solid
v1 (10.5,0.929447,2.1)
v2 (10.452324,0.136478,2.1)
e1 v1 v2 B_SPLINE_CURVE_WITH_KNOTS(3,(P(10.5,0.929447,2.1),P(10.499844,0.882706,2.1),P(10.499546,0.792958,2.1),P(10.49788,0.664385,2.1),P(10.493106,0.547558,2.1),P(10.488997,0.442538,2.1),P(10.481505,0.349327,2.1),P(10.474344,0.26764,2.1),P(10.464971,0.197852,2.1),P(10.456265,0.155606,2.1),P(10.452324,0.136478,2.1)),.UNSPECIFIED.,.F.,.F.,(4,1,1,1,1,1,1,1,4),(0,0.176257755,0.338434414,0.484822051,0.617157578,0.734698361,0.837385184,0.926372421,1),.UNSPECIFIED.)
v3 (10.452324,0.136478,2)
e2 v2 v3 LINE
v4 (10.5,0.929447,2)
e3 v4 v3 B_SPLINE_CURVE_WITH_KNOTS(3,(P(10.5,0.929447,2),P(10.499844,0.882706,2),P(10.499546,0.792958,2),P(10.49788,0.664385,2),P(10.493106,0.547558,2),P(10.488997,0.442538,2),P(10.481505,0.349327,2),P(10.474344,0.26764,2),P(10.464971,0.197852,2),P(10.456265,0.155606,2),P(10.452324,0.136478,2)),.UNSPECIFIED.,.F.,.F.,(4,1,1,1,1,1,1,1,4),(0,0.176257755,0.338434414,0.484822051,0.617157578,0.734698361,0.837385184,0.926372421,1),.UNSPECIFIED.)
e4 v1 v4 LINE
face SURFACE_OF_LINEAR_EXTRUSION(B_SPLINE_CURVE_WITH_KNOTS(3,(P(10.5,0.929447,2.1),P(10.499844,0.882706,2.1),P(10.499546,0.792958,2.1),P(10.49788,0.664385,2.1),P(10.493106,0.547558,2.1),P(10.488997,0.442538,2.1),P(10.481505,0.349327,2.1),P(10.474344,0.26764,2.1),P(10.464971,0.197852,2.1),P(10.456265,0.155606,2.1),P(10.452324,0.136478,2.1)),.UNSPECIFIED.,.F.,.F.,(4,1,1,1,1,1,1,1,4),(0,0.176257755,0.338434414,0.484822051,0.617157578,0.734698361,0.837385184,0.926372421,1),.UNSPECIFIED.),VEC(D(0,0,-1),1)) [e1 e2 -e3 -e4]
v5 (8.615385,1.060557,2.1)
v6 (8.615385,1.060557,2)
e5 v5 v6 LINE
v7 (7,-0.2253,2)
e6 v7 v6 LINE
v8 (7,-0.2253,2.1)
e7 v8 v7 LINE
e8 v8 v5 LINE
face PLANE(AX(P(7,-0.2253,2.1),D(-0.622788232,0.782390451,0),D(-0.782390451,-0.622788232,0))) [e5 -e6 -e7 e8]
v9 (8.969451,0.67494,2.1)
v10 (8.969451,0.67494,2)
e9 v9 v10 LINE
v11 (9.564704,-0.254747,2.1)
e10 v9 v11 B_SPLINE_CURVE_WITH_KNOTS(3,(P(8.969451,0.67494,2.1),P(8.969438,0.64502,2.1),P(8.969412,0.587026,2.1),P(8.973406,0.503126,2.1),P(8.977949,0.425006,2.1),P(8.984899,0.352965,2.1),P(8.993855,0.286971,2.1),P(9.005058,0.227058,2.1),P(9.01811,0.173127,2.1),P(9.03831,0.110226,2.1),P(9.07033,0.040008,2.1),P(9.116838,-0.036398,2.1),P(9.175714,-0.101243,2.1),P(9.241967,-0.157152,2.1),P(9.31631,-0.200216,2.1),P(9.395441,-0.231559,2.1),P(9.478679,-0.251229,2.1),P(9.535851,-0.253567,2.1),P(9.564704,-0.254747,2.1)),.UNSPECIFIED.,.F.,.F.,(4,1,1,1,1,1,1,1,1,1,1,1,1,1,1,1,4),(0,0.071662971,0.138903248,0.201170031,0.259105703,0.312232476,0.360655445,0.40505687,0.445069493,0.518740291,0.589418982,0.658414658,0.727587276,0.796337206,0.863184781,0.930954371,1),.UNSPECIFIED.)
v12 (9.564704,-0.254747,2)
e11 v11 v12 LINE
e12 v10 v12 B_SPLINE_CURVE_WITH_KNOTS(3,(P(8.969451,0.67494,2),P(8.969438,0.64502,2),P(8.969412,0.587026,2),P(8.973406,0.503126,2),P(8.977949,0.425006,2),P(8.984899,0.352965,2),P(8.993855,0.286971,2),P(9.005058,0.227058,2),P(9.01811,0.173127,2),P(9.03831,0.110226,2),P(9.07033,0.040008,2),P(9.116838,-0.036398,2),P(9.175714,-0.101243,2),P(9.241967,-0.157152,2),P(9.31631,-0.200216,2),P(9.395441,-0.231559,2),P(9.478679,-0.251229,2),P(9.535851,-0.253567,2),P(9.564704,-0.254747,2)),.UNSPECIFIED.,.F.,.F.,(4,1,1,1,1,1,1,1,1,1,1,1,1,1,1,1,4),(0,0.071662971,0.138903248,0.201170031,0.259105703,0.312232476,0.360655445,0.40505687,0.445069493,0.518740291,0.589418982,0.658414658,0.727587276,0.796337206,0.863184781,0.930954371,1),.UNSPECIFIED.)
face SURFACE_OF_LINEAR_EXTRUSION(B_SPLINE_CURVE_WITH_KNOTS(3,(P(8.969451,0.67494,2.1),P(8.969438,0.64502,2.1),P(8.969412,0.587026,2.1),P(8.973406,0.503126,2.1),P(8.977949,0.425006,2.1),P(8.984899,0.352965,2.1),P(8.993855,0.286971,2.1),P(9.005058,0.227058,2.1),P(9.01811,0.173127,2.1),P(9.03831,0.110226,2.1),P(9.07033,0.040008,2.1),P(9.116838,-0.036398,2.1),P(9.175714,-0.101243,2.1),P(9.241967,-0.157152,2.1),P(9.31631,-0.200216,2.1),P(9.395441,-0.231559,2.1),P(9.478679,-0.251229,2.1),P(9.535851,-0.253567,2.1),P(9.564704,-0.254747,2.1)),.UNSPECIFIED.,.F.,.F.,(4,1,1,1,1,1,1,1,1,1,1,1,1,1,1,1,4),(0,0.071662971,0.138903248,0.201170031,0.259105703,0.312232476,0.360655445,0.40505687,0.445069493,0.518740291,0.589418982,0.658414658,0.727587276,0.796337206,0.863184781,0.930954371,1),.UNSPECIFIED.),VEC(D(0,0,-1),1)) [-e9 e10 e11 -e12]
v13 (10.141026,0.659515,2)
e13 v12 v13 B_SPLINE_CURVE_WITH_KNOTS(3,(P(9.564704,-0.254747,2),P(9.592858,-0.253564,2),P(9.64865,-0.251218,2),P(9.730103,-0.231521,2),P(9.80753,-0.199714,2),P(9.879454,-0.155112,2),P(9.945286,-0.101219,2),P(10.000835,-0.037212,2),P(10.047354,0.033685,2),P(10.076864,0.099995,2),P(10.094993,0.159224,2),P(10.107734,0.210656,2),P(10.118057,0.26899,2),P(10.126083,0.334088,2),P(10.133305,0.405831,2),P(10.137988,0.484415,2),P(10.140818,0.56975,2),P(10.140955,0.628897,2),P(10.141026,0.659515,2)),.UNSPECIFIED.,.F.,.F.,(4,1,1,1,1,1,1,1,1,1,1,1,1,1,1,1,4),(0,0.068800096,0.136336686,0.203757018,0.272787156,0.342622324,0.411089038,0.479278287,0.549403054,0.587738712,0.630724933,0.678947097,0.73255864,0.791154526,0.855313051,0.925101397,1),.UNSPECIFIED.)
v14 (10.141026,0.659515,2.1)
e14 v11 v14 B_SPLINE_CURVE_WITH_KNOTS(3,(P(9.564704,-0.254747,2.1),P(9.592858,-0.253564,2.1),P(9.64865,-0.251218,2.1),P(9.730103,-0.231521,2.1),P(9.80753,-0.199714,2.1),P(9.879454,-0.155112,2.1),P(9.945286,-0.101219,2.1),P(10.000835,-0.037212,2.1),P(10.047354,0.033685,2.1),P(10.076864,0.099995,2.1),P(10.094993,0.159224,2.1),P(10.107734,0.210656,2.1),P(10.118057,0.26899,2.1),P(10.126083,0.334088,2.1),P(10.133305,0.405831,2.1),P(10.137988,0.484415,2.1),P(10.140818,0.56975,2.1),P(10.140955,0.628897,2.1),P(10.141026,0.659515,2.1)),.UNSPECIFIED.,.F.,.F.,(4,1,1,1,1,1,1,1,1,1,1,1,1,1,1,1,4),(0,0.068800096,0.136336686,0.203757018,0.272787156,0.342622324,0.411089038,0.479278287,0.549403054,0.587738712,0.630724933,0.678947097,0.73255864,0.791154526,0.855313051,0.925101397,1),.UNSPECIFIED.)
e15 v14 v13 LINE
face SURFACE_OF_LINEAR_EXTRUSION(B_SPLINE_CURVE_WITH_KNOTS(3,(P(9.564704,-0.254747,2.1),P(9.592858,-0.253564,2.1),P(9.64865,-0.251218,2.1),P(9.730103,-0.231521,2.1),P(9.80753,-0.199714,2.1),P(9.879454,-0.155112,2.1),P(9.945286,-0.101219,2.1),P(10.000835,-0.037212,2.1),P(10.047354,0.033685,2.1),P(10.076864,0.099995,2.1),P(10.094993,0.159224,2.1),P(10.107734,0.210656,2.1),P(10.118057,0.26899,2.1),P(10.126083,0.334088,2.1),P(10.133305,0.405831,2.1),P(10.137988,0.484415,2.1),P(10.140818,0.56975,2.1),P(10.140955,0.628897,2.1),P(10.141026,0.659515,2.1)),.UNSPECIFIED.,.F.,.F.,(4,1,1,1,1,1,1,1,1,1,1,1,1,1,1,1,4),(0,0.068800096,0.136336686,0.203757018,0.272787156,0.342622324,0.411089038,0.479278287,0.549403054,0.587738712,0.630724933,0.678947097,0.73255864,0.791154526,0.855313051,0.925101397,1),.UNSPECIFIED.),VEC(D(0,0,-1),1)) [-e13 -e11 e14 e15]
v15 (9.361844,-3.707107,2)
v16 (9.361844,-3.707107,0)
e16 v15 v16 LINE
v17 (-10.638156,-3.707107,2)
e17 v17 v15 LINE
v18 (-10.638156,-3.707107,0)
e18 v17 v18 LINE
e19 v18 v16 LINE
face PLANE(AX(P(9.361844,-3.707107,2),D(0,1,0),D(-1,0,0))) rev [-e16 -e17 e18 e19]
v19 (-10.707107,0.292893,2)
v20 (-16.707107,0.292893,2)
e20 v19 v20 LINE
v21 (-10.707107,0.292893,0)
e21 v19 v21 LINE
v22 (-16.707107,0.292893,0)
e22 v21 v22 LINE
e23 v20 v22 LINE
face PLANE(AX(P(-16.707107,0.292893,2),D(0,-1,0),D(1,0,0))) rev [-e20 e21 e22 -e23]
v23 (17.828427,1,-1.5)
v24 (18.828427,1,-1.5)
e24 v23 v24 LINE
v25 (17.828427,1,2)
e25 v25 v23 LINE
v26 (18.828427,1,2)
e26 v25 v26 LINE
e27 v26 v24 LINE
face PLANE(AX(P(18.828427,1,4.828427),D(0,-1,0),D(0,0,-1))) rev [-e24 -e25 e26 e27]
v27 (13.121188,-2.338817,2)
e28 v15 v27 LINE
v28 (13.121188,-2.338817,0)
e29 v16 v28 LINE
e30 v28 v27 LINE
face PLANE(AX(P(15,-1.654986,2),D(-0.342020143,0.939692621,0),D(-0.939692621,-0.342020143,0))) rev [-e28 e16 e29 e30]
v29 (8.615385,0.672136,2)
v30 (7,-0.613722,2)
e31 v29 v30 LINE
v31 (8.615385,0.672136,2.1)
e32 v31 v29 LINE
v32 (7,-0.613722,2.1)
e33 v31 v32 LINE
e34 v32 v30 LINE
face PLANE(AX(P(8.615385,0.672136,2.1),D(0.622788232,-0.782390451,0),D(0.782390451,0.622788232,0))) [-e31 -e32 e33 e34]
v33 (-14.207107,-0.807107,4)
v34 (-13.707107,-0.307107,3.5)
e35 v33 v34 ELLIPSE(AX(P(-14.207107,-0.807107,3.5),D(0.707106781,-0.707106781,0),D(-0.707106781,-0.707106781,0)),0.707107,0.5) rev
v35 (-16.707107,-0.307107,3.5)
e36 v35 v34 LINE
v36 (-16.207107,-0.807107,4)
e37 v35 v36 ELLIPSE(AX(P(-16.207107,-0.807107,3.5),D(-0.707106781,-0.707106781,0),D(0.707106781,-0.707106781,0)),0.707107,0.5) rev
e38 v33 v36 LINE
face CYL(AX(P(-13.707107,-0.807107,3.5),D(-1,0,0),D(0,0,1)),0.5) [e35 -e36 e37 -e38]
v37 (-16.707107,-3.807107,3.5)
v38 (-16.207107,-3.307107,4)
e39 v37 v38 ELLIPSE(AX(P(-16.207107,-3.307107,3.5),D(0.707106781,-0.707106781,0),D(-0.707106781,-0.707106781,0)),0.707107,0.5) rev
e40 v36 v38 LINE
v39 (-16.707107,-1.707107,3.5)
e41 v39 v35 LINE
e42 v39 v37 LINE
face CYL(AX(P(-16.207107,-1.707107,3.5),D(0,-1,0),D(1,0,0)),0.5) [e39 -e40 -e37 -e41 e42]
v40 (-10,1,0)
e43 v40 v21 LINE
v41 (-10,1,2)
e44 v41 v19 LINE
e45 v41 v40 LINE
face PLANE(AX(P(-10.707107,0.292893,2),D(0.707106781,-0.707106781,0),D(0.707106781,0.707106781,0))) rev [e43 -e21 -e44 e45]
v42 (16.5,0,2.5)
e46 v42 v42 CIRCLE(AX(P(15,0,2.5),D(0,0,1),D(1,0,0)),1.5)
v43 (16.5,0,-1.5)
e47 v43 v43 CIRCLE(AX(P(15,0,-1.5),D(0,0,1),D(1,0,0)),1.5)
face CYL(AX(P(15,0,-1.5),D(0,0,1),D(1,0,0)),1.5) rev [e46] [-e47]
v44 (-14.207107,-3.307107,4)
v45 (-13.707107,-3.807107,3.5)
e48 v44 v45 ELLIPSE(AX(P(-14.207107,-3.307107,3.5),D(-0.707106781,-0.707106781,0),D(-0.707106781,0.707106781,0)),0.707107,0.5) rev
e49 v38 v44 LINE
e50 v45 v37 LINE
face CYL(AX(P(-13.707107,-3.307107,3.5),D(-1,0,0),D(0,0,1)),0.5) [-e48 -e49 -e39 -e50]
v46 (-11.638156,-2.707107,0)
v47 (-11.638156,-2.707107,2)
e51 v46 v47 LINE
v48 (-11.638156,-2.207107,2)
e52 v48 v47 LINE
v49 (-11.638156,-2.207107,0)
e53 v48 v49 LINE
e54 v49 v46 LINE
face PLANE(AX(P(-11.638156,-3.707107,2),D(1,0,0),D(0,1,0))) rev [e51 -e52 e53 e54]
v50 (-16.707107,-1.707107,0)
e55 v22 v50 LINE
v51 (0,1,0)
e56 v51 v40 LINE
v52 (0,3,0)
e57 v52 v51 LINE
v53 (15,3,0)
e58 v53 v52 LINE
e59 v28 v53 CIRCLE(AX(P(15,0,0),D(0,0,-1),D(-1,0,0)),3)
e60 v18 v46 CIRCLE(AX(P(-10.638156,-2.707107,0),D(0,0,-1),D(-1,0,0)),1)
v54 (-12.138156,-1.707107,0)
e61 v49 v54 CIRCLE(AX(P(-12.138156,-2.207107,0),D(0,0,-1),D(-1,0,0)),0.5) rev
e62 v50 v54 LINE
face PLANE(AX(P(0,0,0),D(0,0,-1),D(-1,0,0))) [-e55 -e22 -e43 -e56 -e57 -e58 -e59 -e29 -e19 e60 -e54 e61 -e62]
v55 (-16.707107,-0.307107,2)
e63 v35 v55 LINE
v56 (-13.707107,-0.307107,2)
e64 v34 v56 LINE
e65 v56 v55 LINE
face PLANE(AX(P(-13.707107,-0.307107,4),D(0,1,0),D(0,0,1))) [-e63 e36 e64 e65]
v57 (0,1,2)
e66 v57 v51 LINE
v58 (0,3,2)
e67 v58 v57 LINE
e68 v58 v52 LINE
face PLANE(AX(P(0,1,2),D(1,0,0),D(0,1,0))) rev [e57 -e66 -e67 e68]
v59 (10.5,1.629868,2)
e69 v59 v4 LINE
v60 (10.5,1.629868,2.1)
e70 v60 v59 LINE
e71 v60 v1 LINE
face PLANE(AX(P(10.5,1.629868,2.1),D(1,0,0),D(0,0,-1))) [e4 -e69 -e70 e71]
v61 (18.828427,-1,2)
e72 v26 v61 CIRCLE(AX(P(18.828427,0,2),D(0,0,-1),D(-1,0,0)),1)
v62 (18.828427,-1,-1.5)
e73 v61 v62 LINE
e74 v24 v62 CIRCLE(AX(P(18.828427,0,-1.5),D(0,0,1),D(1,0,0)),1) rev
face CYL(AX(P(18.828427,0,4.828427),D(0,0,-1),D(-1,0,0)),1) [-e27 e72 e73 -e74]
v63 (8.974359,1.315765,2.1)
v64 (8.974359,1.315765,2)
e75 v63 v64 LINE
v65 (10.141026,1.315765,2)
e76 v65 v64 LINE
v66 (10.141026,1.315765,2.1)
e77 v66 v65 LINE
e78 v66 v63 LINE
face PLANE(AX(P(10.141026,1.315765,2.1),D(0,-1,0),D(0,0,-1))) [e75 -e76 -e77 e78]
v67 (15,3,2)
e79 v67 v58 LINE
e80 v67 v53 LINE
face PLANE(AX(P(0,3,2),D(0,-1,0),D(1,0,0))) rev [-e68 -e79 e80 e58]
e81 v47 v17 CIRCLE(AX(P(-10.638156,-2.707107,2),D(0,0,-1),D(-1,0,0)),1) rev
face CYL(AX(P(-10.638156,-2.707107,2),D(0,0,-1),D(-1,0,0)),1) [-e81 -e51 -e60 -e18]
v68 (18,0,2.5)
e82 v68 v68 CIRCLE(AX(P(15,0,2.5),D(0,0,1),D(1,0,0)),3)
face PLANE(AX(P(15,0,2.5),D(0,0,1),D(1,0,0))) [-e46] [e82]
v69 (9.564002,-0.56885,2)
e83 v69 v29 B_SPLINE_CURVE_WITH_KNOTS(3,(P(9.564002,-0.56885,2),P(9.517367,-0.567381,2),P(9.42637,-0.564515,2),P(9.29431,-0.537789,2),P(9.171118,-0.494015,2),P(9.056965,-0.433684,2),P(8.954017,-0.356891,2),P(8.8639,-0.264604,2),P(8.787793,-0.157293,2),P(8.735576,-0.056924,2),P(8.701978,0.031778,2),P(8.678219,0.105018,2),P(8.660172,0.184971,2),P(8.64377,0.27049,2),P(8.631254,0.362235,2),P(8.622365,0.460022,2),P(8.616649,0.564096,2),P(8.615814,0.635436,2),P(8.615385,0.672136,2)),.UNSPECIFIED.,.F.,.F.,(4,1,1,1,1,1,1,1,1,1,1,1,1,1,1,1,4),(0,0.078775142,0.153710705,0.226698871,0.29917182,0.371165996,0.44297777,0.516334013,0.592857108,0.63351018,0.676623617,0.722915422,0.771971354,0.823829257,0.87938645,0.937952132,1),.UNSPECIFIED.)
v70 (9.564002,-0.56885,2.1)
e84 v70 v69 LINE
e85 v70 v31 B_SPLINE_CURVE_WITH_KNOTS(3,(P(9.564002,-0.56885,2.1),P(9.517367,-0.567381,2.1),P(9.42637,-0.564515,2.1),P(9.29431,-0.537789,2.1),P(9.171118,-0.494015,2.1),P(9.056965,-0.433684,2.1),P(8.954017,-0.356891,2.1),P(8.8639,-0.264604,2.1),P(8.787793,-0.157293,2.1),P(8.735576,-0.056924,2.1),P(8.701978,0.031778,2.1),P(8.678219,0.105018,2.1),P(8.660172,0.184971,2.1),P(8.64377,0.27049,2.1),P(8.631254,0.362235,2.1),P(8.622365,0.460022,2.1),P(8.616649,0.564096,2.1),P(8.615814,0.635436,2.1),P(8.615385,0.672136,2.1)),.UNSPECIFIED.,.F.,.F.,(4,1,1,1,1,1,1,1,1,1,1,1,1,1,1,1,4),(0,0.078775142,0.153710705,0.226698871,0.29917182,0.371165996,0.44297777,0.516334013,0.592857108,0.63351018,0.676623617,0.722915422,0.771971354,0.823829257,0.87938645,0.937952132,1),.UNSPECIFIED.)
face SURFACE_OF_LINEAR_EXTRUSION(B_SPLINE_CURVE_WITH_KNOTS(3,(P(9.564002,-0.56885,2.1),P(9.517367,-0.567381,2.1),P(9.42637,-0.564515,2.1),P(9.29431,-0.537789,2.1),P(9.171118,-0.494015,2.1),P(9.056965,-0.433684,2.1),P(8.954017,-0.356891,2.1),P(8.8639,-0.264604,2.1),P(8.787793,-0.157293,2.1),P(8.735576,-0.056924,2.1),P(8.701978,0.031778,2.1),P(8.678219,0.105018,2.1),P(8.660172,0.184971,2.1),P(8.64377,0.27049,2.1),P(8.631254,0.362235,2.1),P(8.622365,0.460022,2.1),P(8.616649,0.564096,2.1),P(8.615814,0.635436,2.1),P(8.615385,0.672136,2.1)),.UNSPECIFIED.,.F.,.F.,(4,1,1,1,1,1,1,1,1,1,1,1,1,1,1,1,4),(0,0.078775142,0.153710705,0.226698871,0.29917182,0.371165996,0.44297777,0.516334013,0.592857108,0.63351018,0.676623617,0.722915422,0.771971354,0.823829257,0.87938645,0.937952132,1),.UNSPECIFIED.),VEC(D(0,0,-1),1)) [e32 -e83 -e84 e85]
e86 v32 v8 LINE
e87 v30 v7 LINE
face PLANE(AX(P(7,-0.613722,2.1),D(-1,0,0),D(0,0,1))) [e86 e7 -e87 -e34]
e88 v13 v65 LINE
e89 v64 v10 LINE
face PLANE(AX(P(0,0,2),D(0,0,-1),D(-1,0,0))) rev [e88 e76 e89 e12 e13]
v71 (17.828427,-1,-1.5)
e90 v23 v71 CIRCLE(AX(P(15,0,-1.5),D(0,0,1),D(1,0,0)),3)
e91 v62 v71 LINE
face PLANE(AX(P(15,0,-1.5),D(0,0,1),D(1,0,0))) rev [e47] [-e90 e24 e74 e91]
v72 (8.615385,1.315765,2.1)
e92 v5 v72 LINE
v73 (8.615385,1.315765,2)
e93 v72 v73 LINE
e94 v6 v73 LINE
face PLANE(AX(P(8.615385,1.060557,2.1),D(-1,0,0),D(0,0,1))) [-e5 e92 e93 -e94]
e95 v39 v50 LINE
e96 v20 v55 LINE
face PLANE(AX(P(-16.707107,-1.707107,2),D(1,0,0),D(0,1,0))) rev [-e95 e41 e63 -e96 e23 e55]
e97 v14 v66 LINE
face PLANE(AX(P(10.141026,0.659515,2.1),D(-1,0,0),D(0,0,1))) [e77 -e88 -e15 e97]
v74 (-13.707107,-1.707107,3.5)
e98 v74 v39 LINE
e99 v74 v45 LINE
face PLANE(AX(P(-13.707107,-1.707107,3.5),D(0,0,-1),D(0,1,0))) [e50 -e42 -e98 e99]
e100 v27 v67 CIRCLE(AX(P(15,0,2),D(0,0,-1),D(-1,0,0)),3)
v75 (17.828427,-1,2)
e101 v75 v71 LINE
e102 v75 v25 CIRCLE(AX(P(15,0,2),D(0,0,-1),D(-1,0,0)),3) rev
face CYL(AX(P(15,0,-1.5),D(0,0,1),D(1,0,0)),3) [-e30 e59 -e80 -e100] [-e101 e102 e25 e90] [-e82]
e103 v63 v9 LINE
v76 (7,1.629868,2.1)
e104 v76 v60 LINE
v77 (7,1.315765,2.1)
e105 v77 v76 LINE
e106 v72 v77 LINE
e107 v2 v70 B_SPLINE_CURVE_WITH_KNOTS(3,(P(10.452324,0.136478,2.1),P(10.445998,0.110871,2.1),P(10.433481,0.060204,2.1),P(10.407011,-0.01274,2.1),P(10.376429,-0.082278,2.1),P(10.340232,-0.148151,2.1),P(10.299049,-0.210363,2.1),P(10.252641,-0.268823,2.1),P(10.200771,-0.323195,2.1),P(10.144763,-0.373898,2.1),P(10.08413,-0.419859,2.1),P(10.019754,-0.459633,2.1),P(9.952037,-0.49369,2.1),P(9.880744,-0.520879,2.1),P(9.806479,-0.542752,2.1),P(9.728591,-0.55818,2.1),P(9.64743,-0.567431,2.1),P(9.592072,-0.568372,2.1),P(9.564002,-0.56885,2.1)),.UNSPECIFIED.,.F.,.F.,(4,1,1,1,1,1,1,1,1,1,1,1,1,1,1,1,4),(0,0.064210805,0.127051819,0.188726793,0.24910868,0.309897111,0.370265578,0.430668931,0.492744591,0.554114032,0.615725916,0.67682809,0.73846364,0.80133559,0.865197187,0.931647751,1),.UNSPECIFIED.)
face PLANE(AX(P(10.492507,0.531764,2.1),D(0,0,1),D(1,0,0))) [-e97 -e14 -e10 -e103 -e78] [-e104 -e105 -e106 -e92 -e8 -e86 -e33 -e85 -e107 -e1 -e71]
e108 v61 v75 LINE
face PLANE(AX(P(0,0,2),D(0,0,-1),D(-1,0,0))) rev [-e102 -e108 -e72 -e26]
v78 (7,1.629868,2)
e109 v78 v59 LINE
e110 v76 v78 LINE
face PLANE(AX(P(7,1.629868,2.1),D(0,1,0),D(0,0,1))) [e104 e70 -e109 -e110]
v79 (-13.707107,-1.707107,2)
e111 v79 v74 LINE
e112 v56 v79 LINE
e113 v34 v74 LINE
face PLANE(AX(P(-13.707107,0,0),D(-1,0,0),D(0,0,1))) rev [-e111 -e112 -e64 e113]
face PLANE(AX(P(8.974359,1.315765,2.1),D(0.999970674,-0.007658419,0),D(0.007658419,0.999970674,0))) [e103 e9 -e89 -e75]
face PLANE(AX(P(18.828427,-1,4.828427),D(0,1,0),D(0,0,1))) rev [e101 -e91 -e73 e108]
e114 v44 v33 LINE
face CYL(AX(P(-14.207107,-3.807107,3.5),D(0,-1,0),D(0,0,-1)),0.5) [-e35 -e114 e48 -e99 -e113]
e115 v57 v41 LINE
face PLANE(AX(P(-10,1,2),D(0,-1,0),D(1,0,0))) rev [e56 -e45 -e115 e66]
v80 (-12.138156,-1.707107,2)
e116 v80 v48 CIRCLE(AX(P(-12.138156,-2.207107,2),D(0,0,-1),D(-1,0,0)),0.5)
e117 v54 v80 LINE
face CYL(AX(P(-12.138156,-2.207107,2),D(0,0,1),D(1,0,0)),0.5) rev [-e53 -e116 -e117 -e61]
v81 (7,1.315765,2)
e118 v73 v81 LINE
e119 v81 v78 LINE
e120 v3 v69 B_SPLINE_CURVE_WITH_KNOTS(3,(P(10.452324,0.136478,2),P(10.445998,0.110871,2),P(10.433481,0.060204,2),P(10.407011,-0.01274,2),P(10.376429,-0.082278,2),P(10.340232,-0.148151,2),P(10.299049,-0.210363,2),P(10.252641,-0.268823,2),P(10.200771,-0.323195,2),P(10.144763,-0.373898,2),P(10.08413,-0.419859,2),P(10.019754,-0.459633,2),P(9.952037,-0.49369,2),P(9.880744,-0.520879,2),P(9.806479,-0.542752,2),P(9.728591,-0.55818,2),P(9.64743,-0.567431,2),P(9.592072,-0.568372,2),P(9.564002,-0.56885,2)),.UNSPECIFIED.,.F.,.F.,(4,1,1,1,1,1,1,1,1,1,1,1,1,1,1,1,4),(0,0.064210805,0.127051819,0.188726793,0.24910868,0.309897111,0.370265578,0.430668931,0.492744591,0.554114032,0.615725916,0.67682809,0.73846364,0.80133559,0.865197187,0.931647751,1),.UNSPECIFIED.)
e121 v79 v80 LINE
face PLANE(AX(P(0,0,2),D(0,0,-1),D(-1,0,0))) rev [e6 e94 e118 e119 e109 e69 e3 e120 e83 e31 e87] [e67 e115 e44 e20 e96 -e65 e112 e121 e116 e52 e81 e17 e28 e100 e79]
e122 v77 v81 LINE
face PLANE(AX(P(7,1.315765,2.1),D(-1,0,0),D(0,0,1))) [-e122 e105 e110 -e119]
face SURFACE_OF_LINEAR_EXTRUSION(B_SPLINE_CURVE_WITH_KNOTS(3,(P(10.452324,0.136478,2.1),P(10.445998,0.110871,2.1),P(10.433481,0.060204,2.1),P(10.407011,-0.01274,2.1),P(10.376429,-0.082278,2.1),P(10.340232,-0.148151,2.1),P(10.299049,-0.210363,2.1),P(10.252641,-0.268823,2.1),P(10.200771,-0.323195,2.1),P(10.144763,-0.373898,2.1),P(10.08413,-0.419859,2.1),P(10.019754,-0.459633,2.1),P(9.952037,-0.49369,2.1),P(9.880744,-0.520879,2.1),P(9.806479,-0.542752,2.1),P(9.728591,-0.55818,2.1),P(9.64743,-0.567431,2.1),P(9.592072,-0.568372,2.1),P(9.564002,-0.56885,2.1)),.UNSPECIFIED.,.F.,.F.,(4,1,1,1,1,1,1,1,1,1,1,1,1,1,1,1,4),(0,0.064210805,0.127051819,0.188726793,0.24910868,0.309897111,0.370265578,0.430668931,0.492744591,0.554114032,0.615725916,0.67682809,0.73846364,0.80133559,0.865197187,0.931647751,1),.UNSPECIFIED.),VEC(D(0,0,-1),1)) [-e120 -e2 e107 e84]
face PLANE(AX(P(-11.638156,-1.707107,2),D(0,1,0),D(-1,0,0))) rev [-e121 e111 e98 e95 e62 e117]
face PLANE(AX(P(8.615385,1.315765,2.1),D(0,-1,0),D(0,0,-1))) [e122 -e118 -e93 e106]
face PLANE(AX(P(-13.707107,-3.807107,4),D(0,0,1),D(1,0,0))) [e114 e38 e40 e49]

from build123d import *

# Parameters (mm, degrees)
ESTRUSIONE_ESTRUSIONE1_DEPTH             = 2
RACCORDO1_R                              = 1
RACCORDO2_R                              = 0.5
ESTRUSIONE_ESTRUSIONE2_DEPTH             = 2.5
ESTRUSIONE_ESTRUSIONE2_DEPTH_BACK        = 1.5
SCHIZZO2_R                               = 3
ESTRUSIONE_ESTRUSIONE3_REACH             = 20.547
ESTRUSIONE_ESTRUSIONE3_DIRECTION_2_REACH = 20.547
ESTRUSIONE_ESTRUSIONE4_DEPTH             = 3
RACCORDO3_R                              = 0.5
SCHIZZO5_R                               = 1.5
TAGLIO_ESTRUSIONE1_DEPTH                 = 21.58301689
ESTRUSIONE_ESTRUSIONE5_DEPTH             = 0.1


with BuildPart() as part:
    # Schizzo1 → Estrusione-Estrusione1 (new body)
    with BuildSketch(Plane.XY):
        Polygon((-16.707106781, 0.292893219), (-10.707106781, 0.292893219), (-10, 1), (0, 1), (0, 3), (15, 3), (15, 0), (15, -1.654985921), (9.361844275, -3.707106781), (-11.638155725, -3.707106781), (-11.638155725, -1.707106781), (-16.707106781, -1.707106781), align=None)
    extrude(amount=ESTRUSIONE_ESTRUSIONE1_DEPTH)

    # Raccordo1
    raccordo1_edges = [part.edges().sort_by_distance(p)[0] for p in [
        (-11.638155725, -3.707106781, 1),
    ]]
    fillet(raccordo1_edges, radius=RACCORDO1_R)

    # Raccordo2
    raccordo2_edges = [part.edges().sort_by_distance(p)[0] for p in [
        (-11.638155725, -1.707106781, 1),
    ]]
    fillet(raccordo2_edges, radius=RACCORDO2_R)

    # Schizzo2 → Estrusione-Estrusione2 (add, two sides: drawn at the far end of the back side and taken through both)
    with BuildSketch(Plane.XY.offset(-ESTRUSIONE_ESTRUSIONE2_DEPTH_BACK)):
        with Locations((15, 0)):
            Circle(SCHIZZO2_R)
    extrude(amount=ESTRUSIONE_ESTRUSIONE2_DEPTH + ESTRUSIONE_ESTRUSIONE2_DEPTH_BACK)

    # Estrusione-Estrusione3: up to this face of the body (flat: up to its plane)
    estrusione_estrusione3_end = Plane(part.part.faces().sort_by_distance((0.378494116, -0.704899382, 2))[0])
    # Schizzo3 → Estrusione-Estrusione3 (add, up to the picked face)
    with BuildSketch(Plane.XY, mode=Mode.PRIVATE) as estrusione_estrusione3_sk1:
        with BuildLine():
            Line((18.828427125, 1), (17.828427125, 1))
            ThreePointArc((17.828427125, 1), (18, 0), (17.828427125, -1))
            Line((17.828427125, -1), (18.828427125, -1))
            ThreePointArc((18.828427125, -1), (19.828427125, 0), (18.828427125, 1))
        make_face()
    estrusione_estrusione3_tool1 = split(extrude(estrusione_estrusione3_sk1.sketch, amount=ESTRUSIONE_ESTRUSIONE3_REACH, mode=Mode.PRIVATE), bisect_by=estrusione_estrusione3_end, keep=Keep.BOTH, mode=Mode.PRIVATE)
    add(estrusione_estrusione3_tool1.solids().sort_by(Axis((18.792788, 0, 0), (0, 0, 1)))[0])

    # Estrusione-Estrusione3 direction 2: up to this face of the body (flat: up to its plane)
    estrusione_estrusione3_direction_2_end = Plane(part.part.faces().sort_by_distance((15, 0, -1.5))[0])
    # Schizzo3 → Estrusione-Estrusione3 direction 2 (add, up to the picked face)
    with BuildSketch(Plane.XY, mode=Mode.PRIVATE) as estrusione_estrusione3_direction_2_sk1:
        with BuildLine():
            Line((18.828427125, 1), (17.828427125, 1))
            ThreePointArc((17.828427125, 1), (18, 0), (17.828427125, -1))
            Line((17.828427125, -1), (18.828427125, -1))
            ThreePointArc((18.828427125, -1), (19.828427125, 0), (18.828427125, 1))
        make_face()
    estrusione_estrusione3_direction_2_tool1 = split(extrude(estrusione_estrusione3_direction_2_sk1.sketch, amount=-ESTRUSIONE_ESTRUSIONE3_DIRECTION_2_REACH, mode=Mode.PRIVATE), bisect_by=estrusione_estrusione3_direction_2_end, keep=Keep.BOTH, mode=Mode.PRIVATE)
    add(estrusione_estrusione3_direction_2_tool1.solids().sort_by(Axis((18.792788, 0, 0), (0, 0, -1)))[0])

    # Schizzo4 → Estrusione-Estrusione4 (add)
    with BuildSketch(Plane.ZY.offset(16.707106781)):
        Polygon((2, -1.707106781), (3.5, -1.707106781), (3.5, -3.807106781), (4, -3.807106781), (4, -0.307106781), (2, -0.307106781), align=None)
    extrude(amount=-ESTRUSIONE_ESTRUSIONE4_DEPTH)

    # Raccordo3
    raccordo3_edges = [part.edges().sort_by_distance(p)[0] for p in [
        (-15.207106781, -0.307106781, 4),
        (-13.707106781, -2.057106781, 4),
        (-15.207106781, -3.807106781, 4),
        (-16.707106781, -2.057106781, 4),
    ]]
    fillet(raccordo3_edges, radius=RACCORDO3_R - 0.0001)  # a hair under: the kernel refuses the full size

    # Schizzo5 → Taglio-Estrusione1 (cut, through all)
    with BuildSketch(Plane.XY.offset(2.5)):
        with Locations((15, 0)):
            Circle(SCHIZZO5_R)
    extrude(amount=-TAGLIO_ESTRUSIONE1_DEPTH, mode=Mode.SUBTRACT)

    # Schizzo6 → Estrusione-Estrusione5 (add)
    with BuildSketch(Plane.XY.offset(2)):
        with BuildLine():
            Line((10.5, 1.629867893), (10.5, 0.92944722))
            add(Edge.make_bspline(
                [(10.5, 0.92944722), (10.499844414, 0.882706092), (10.499545672, 0.792957947), (10.497879909, 0.664384677), (10.493105553, 0.54755758), (10.48899697, 0.442537741), (10.481505028, 0.349327086), (10.474344381, 0.267639795), (10.46497072, 0.197852097), (10.456265297, 0.155606246), (10.452323718, 0.13647847)],
                knots=[0, 0, 0, 0, 1.410062039, 2.707475311, 3.878576406, 4.937260626, 5.877586885, 6.699081471, 7.410979367, 8, 8, 8, 8], degree=3))
            add(Edge.make_bspline(
                [(10.452323718, 0.13647847), (10.44599767, 0.110871395), (10.433480527, 0.060203513), (10.407010513, -0.012740009), (10.376429305, -0.082278475), (10.340231746, -0.148150926), (10.299049203, -0.210363472), (10.252641058, -0.268822966), (10.200770974, -0.323195178), (10.144763494, -0.373898474), (10.084129937, -0.419859381), (10.019753567, -0.459632532), (9.952037023, -0.493690082), (9.88074449, -0.520879248), (9.80647863, -0.542752098), (9.72859096, -0.55817975), (9.647429673, -0.567430547), (9.592071808, -0.568372457), (9.564002404, -0.568850055)],
                knots=[0, 0, 0, 0, 1.02737288, 2.032829108, 3.019628684, 3.985738875, 4.958353778, 5.924249254, 6.890702889, 7.883913451, 8.865824512, 9.85161466, 10.829249435, 11.81541824, 12.821369441, 13.843154991, 14.906364023, 16, 16, 16, 16], degree=3))
            add(Edge.make_bspline(
                [(9.564002404, -0.568850055), (9.517367246, -0.567381095), (9.426369973, -0.564514774), (9.294309841, -0.537789138), (9.171117785, -0.494014565), (9.056965246, -0.433684102), (8.954017226, -0.356891178), (8.863900454, -0.264603546), (8.787792734, -0.157292512), (8.735576131, -0.056923958), (8.70197773, 0.031778426), (8.678219098, 0.105018096), (8.660172121, 0.18497086), (8.643769941, 0.270489675), (8.631253759, 0.362235095), (8.622364892, 0.460022369), (8.616649282, 0.564096068), (8.615814207, 0.635435829), (8.615384615, 0.672135521)],
                knots=[0, 0, 0, 0, 1.260402266, 2.459371274, 3.627181936, 4.786749125, 5.93865593, 7.087644312, 8.261344208, 9.485713728, 10.136162886, 10.825977872, 11.566646758, 12.35154167, 13.181268117, 14.0701832, 15.007234106, 16, 16, 16, 16], degree=3))
            Line((8.615384615, 0.672135521), (7, -0.61372185))
            Line((7, -0.61372185), (7, -0.225300376))
            Line((7, -0.225300376), (8.615384615, 1.060556996))
            Line((8.615384615, 1.060556996), (8.615384615, 1.315765329))
            Line((8.615384615, 1.315765329), (7, 1.315765329))
            Line((7, 1.315765329), (7, 1.629867893))
            Line((7, 1.629867893), (10.5, 1.629867893))
        make_face()
        with BuildLine():
            Line((10.141025641, 1.315765329), (8.974358974, 1.315765329))
            Line((8.974358974, 1.315765329), (8.969451122, 0.674940009))
            add(Edge.make_bspline(
                [(8.969451122, 0.674940009), (8.969437885, 0.64501997), (8.969412229, 0.587026413), (8.973406004, 0.503125746), (8.977949327, 0.425005641), (8.984898657, 0.352964869), (8.993854777, 0.286971357), (9.005057604, 0.227057739), (9.01811018, 0.173127354), (9.038309643, 0.110226003), (9.070330282, 0.040008487), (9.116838436, -0.036397556), (9.175714061, -0.101242729), (9.241967426, -0.157151837), (9.316309813, -0.200216089), (9.395441443, -0.23155931), (9.478679147, -0.251228927), (9.53585099, -0.253567367), (9.564703526, -0.254747491)],
                knots=[0, 0, 0, 0, 1.14660753, 2.222451964, 3.218720504, 4.145691244, 4.995719623, 5.770487122, 6.480909919, 7.121111896, 8.299844659, 9.430703709, 10.534634535, 11.641396424, 12.741395289, 13.810956493, 14.895269934, 16, 16, 16, 16], degree=3))
            add(Edge.make_bspline(
                [(9.564703526, -0.254747491), (9.592857905, -0.253563739), (9.648649611, -0.251217974), (9.730103047, -0.231521199), (9.807529909, -0.199713788), (9.879454388, -0.155112436), (9.94528638, -0.101218543), (10.000835297, -0.037211531), (10.047354277, 0.033685128), (10.076864421, 0.09999535), (10.094992971, 0.159223507), (10.107734135, 0.210655613), (10.118056983, 0.268990383), (10.126082803, 0.334088015), (10.133305124, 0.405830736), (10.137987885, 0.484414991), (10.140818147, 0.569750034), (10.140954867, 0.628897216), (10.141025641, 0.659515329)],
                knots=[0, 0, 0, 0, 1.100801541, 2.181386982, 3.260112282, 4.364594493, 5.481957178, 6.577424609, 7.668452592, 8.790448866, 9.403819393, 10.091598921, 10.863153553, 11.720938239, 12.658472417, 13.685008818, 14.801622349, 16, 16, 16, 16], degree=3))
            Line((10.141025641, 0.659515329), (10.141025641, 1.315765329))
        make_face(mode=Mode.SUBTRACT)
    extrude(amount=ESTRUSIONE_ESTRUSIONE5_DEPTH)


solid = part.part
